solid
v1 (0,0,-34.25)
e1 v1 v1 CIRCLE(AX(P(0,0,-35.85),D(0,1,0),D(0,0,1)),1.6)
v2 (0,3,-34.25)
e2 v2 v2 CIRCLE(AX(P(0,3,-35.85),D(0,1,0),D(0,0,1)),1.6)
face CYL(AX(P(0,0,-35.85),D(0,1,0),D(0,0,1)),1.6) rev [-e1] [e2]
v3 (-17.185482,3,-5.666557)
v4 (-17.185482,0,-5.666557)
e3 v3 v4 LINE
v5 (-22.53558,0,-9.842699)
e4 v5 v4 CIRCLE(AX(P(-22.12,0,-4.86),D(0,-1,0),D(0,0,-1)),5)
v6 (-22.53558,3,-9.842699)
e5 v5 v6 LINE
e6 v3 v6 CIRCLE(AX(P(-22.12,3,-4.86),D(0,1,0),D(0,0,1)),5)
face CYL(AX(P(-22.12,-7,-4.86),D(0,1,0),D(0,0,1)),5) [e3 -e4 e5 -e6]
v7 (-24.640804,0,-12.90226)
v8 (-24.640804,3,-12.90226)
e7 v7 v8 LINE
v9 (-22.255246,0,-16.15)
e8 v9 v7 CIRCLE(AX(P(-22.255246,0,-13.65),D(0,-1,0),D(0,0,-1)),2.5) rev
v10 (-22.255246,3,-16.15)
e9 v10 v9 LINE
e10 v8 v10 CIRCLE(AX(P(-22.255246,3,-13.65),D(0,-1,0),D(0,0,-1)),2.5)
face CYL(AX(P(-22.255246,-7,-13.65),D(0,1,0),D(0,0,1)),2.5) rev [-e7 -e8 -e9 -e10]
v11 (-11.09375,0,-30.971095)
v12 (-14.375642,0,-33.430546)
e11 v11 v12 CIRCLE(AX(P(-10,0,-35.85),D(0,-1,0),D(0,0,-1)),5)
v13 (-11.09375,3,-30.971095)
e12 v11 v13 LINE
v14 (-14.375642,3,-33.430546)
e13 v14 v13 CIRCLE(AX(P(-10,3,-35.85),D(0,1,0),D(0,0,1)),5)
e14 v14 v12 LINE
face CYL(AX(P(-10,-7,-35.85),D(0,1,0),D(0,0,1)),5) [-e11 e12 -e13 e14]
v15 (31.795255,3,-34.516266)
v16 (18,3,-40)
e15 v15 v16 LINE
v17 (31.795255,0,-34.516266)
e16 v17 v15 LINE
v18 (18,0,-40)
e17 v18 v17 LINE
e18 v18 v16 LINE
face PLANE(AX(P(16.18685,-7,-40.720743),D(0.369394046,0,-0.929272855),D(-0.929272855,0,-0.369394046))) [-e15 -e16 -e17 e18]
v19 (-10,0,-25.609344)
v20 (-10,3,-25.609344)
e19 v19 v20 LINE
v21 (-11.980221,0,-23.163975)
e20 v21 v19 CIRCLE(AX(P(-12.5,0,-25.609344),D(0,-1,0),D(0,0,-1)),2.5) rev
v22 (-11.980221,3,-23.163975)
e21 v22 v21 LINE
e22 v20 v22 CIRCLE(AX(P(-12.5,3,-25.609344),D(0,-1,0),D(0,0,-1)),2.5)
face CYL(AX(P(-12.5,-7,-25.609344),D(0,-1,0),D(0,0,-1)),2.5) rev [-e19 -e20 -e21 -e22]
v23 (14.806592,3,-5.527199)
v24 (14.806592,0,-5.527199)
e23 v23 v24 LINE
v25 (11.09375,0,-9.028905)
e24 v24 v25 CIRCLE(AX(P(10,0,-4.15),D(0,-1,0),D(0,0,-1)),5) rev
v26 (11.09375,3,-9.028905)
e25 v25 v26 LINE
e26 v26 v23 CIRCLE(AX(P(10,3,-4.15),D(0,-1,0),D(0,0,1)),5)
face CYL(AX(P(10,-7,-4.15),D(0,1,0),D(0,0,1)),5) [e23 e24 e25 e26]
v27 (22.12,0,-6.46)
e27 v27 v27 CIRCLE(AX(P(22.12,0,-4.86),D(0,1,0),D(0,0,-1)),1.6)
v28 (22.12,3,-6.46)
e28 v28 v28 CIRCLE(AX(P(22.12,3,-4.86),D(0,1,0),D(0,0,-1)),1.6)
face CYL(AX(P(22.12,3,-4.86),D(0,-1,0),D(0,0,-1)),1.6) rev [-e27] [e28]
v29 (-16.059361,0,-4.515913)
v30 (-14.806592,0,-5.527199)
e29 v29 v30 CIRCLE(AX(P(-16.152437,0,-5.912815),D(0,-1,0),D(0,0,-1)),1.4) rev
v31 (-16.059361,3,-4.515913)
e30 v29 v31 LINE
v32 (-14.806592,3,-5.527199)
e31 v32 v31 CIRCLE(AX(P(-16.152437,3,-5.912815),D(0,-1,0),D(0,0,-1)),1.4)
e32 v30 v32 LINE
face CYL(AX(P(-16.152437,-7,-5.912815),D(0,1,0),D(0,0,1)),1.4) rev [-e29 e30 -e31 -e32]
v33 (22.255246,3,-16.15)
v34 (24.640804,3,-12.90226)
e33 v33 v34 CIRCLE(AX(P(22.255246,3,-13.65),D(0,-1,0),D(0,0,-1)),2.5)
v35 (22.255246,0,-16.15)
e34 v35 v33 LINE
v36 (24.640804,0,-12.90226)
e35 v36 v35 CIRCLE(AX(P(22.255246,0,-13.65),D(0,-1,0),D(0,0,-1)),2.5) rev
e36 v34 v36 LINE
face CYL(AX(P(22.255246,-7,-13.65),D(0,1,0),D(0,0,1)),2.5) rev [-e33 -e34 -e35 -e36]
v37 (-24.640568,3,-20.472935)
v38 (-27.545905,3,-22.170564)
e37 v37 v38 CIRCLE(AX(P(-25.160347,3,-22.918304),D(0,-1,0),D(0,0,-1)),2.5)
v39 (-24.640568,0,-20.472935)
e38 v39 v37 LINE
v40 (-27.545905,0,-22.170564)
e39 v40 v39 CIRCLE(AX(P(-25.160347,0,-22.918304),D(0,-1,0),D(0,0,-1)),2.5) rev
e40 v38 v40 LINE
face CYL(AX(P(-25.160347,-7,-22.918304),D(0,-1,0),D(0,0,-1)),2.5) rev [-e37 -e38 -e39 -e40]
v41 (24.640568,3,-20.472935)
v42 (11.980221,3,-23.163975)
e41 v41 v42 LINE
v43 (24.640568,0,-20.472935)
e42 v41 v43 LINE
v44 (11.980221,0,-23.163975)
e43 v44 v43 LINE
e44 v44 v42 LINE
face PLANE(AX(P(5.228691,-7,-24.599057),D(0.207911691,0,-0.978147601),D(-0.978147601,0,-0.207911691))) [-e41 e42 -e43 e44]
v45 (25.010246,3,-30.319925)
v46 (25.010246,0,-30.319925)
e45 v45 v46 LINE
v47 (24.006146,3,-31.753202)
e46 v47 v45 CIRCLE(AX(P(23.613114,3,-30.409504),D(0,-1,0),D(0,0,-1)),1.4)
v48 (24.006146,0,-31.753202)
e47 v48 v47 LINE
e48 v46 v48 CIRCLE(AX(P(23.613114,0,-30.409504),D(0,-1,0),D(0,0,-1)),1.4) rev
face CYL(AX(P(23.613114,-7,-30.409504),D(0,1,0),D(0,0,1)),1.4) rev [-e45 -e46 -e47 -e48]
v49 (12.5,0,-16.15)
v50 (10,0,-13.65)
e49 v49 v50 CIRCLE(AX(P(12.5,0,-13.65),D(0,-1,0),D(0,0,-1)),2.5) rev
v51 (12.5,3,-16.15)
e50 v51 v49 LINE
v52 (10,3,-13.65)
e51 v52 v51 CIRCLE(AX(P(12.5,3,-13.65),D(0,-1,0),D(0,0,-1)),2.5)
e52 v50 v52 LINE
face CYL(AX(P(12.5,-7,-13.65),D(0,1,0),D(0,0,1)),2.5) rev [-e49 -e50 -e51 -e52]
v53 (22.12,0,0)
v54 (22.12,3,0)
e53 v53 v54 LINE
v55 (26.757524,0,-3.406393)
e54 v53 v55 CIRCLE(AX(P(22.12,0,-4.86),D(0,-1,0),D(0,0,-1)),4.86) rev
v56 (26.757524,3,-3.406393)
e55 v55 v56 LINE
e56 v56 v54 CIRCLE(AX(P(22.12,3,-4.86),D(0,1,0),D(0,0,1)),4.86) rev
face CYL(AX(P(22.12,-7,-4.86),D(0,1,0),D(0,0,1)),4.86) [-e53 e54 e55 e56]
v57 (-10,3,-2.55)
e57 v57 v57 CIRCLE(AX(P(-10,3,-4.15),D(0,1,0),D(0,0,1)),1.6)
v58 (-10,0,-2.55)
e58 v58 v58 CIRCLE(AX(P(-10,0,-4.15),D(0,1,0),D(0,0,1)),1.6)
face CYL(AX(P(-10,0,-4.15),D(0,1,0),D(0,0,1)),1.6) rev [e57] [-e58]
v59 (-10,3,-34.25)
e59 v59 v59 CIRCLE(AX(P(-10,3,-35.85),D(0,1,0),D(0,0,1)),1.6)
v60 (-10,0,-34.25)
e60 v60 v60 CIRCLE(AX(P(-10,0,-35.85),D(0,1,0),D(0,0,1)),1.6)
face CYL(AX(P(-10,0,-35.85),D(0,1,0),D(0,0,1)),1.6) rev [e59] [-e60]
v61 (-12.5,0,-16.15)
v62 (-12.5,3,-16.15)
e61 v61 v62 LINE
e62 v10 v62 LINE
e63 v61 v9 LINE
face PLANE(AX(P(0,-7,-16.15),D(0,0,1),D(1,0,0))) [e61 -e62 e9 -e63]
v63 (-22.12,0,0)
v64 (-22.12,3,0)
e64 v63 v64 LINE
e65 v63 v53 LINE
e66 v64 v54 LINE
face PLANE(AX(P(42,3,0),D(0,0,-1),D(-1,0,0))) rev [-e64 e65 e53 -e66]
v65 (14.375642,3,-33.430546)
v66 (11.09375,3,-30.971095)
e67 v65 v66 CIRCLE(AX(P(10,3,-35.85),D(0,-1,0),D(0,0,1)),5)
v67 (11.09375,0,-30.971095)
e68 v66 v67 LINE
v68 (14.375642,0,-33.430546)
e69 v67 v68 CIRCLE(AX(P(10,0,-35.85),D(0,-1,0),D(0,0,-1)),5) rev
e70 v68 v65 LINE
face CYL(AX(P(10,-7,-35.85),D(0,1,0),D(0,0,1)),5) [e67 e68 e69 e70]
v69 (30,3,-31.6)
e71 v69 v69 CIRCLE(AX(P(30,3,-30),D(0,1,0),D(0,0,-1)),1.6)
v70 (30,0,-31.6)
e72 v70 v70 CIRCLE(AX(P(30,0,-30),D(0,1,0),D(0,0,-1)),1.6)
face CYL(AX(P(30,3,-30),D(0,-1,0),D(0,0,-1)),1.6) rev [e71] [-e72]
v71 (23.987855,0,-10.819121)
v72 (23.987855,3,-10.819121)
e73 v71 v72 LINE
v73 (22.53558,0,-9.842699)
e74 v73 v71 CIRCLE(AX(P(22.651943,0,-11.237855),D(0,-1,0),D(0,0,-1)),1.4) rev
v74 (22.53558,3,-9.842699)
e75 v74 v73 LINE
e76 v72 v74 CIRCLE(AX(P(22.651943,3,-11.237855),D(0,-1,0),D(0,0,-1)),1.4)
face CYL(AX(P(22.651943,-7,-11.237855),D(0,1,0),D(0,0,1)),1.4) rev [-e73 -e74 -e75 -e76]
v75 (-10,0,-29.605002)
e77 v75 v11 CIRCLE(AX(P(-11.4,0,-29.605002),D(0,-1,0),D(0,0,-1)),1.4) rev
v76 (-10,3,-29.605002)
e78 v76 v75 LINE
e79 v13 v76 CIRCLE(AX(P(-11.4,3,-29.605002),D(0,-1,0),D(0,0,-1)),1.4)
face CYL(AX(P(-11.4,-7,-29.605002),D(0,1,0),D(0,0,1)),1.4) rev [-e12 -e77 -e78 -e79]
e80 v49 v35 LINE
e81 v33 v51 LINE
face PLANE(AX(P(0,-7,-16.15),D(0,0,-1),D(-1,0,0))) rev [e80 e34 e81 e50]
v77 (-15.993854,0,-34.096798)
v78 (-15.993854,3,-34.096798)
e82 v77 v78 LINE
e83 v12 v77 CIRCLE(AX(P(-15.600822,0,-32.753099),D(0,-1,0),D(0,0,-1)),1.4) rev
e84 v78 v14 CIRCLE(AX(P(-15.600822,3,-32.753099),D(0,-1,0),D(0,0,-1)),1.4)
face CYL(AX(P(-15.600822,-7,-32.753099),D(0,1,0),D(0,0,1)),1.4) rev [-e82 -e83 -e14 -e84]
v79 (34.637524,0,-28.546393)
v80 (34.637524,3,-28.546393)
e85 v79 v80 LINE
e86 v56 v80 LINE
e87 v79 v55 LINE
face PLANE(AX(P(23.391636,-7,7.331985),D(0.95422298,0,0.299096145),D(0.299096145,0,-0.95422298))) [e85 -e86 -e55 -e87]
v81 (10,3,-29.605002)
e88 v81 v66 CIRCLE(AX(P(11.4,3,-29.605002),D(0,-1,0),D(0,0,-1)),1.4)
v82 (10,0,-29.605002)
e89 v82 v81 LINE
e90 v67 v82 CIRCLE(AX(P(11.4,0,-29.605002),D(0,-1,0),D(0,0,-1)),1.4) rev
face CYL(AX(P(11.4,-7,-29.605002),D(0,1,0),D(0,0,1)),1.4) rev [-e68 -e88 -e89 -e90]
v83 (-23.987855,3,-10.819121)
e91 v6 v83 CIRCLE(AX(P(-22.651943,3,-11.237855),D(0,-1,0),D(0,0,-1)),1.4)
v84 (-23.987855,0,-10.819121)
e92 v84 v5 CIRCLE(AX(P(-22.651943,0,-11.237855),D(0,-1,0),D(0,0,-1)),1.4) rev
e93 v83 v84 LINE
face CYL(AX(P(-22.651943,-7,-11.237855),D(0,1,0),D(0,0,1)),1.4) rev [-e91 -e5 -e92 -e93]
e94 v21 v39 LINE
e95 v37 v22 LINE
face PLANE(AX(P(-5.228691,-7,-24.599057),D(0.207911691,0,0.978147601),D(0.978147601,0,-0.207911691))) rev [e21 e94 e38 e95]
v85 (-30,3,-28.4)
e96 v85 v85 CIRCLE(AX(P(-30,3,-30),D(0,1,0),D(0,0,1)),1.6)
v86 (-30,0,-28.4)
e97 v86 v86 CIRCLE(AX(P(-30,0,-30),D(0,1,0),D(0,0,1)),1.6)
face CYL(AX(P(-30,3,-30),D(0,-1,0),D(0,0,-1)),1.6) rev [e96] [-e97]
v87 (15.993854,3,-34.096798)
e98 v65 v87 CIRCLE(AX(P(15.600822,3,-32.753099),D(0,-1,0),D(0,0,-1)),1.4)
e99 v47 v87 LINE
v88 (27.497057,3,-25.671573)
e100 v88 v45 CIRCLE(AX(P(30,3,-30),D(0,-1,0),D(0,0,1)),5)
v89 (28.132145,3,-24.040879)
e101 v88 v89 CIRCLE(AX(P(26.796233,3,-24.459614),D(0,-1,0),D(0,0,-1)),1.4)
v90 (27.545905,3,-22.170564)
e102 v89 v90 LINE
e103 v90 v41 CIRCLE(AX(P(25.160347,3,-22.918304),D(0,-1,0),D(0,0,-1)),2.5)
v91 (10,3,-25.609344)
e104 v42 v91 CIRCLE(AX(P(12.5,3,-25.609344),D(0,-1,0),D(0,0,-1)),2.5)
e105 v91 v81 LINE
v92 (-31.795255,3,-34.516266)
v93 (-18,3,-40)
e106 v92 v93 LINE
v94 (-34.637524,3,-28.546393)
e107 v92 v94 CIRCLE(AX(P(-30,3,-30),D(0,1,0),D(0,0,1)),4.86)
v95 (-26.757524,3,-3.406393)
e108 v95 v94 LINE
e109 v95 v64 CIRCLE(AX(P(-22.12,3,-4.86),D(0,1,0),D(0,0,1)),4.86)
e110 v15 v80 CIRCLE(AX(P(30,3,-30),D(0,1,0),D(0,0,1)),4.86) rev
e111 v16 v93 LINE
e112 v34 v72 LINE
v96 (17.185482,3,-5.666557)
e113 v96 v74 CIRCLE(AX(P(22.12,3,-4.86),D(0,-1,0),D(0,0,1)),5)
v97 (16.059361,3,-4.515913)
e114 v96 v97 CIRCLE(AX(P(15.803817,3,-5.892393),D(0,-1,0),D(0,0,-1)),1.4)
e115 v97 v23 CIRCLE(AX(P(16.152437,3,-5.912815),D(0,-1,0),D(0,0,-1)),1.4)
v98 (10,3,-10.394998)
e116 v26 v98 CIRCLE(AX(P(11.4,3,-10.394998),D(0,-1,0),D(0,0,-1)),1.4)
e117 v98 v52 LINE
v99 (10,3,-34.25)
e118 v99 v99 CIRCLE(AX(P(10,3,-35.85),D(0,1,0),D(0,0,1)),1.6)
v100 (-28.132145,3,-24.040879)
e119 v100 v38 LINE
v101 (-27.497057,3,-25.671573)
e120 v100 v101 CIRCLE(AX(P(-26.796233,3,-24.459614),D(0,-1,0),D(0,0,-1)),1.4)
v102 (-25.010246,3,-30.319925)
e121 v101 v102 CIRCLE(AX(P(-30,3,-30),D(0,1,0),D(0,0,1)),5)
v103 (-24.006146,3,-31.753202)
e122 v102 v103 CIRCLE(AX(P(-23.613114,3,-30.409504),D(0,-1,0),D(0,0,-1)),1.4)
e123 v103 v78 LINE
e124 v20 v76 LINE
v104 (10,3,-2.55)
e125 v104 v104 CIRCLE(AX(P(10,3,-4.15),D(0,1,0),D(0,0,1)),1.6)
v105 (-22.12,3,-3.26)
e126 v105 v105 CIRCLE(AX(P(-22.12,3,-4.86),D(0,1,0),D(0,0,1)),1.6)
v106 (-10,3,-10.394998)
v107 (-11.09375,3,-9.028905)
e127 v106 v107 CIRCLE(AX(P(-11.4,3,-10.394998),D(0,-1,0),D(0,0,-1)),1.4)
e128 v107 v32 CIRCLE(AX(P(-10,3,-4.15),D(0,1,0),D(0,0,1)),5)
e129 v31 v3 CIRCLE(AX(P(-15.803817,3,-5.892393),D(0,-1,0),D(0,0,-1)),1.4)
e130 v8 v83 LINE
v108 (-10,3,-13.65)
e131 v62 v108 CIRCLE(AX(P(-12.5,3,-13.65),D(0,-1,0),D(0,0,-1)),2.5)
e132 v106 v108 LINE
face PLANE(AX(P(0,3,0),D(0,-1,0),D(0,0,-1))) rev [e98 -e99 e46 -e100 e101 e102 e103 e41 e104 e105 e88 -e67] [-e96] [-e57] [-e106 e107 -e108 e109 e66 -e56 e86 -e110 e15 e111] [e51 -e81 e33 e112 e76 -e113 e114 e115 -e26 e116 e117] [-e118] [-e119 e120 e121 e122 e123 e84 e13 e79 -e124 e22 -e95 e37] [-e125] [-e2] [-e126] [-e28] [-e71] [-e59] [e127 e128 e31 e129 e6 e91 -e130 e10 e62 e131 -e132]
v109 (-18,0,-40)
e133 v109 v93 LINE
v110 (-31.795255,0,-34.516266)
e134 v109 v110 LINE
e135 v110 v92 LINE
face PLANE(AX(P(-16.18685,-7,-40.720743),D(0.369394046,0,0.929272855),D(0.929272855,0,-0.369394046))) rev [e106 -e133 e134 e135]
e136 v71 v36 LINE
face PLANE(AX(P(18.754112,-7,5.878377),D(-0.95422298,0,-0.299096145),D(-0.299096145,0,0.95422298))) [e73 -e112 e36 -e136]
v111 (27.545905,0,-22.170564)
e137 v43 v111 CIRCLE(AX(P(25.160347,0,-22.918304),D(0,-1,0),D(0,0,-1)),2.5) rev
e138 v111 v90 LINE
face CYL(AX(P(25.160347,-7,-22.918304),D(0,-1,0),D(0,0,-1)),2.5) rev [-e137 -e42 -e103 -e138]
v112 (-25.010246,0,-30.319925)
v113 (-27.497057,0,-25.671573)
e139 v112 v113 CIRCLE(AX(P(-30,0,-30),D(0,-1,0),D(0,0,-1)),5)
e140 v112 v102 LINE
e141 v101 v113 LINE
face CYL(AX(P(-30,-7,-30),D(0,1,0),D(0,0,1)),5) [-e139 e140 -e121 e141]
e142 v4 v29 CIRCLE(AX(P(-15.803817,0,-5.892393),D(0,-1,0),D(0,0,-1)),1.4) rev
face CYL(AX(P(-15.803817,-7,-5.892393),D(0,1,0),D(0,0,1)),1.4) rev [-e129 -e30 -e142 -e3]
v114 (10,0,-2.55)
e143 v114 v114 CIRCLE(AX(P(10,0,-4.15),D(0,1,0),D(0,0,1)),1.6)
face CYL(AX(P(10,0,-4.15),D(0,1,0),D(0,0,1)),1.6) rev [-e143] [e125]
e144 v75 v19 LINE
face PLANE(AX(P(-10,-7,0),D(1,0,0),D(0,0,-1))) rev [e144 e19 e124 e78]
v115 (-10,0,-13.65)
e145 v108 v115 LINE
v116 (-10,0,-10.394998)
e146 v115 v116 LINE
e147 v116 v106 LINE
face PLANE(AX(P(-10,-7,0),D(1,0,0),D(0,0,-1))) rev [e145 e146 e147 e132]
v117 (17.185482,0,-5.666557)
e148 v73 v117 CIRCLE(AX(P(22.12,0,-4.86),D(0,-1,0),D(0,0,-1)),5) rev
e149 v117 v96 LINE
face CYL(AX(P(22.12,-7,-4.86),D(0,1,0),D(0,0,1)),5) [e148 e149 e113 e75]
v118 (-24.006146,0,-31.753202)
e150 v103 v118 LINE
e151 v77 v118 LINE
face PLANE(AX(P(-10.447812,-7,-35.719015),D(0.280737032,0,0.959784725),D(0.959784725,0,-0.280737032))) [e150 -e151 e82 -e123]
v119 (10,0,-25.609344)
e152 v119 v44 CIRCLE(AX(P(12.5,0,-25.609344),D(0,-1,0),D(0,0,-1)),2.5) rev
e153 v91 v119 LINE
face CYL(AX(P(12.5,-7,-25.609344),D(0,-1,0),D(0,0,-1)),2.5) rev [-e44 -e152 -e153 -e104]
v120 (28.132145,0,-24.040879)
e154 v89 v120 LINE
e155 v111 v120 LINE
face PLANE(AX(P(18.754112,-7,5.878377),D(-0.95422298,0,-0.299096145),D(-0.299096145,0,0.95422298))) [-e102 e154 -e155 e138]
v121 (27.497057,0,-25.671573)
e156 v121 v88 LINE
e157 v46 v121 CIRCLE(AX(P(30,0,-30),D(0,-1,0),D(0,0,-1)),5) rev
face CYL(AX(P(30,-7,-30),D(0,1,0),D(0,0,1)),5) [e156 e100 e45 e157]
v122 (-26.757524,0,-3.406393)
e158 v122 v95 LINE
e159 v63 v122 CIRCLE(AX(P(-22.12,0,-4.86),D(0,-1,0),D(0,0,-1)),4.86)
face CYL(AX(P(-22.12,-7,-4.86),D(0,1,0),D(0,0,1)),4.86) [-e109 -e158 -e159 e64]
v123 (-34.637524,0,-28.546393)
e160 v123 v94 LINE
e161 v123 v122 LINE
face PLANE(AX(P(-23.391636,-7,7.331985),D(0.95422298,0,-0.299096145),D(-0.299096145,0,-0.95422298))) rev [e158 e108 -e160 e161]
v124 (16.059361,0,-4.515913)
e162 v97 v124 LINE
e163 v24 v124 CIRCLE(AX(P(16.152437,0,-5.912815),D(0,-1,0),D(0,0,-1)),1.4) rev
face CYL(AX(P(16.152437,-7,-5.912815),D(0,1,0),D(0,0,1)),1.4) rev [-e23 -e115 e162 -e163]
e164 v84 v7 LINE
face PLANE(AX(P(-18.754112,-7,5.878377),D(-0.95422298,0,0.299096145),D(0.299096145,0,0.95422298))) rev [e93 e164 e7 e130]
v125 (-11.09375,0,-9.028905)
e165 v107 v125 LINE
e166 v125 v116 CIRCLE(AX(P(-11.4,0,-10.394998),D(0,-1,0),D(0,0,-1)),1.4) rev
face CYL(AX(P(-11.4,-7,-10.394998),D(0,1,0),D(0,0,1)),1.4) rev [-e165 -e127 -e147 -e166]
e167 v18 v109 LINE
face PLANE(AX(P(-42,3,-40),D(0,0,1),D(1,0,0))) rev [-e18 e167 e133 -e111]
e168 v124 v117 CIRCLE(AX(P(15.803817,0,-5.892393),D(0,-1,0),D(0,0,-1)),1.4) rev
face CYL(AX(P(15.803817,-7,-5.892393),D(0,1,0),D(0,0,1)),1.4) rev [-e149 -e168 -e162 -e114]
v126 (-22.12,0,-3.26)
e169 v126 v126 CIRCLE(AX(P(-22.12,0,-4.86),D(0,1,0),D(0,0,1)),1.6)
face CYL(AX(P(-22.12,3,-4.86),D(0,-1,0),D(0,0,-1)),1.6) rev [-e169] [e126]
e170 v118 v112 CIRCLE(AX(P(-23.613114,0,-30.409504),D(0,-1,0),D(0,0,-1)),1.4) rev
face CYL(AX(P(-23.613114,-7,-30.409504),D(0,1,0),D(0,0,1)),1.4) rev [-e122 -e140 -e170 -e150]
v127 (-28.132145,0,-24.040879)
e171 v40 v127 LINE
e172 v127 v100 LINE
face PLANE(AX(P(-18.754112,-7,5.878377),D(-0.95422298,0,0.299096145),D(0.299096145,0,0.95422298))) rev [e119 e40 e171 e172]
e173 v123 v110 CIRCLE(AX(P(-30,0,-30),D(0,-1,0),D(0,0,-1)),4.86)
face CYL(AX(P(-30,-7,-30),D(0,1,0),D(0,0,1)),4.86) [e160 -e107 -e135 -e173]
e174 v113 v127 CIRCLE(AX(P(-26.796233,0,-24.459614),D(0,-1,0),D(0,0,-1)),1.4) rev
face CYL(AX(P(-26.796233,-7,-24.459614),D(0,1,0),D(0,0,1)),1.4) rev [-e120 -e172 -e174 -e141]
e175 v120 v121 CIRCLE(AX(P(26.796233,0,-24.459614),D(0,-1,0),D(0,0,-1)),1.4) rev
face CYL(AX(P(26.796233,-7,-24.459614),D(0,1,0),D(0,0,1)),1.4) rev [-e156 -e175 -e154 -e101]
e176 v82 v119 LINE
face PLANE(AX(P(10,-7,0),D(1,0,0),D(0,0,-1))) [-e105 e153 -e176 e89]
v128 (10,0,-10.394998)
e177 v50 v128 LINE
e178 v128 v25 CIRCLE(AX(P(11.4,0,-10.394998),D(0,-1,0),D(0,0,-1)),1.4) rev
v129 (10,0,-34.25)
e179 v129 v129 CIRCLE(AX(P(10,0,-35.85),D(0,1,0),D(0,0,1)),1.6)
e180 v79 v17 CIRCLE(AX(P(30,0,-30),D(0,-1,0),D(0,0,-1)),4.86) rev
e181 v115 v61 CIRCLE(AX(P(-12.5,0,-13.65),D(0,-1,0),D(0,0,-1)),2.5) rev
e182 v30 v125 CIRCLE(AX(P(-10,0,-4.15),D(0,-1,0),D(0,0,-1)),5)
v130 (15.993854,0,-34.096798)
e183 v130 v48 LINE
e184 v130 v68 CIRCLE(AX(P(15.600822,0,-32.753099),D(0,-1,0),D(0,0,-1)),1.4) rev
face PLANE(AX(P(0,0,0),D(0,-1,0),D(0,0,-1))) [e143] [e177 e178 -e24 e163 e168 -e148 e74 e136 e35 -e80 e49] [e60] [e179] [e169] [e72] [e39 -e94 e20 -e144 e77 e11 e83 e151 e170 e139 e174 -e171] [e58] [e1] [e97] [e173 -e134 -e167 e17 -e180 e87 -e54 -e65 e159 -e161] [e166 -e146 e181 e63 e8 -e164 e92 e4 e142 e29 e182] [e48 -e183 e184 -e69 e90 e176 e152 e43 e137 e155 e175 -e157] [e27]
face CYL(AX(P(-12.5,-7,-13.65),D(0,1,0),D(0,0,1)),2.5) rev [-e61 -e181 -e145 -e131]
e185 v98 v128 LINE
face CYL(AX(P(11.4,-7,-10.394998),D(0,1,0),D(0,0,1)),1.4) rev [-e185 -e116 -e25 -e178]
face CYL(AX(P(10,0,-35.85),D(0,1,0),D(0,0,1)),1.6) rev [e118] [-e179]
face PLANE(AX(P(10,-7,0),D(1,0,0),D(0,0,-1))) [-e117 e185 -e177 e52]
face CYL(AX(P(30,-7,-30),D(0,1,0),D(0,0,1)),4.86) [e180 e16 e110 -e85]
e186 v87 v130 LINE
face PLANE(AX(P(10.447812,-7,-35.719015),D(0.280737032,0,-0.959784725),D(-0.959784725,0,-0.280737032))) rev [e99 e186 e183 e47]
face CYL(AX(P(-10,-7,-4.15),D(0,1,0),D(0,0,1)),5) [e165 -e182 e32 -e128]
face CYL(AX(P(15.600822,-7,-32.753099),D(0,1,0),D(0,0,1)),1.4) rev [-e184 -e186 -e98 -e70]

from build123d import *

# Parameters (mm, degrees)
SKETCH_1_R             = 1.6
EXTRUDE_1_DEPTH        = 3
SKETCH_2_R             = 1.6
CUT_EXTRUDE_1_DEPTH    = 59.077534383
CUT_EXTRUDE_2_DEPTH    = 10
CUT_EXTRUDE_3_DEPTH    = 10
FILLET_1_R             = 2.5
FILLET_2_R             = 1.4
FILLET_1_OF_MIRROR_1_R = 2.5
FILLET_2_OF_MIRROR_1_R = 1.4


with BuildPart() as part:
    # 草图1 → 凸台-拉伸1 (new body)
    with BuildSketch(Plane(origin=(0, 0, 0), x_dir=(1, 0, 0), z_dir=(0, 1, 0))):
        Polygon((42, 0), (-42, 0), (-42, 40), (0, 40), (42, 40), align=None)
        with Locations(Location((-22.12, 4.86, 0), (0, 0, 270))):
            Circle(SKETCH_1_R, mode=Mode.SUBTRACT)
        with Locations(Location((-30, 30, 0), (0, 0, 270))):
            Circle(SKETCH_1_R, mode=Mode.SUBTRACT)
        with Locations(Location((30, 30, 0), (0, 0, 90))):
            Circle(SKETCH_1_R, mode=Mode.SUBTRACT)
        with Locations(Location((22.12, 4.86, 0), (0, 0, 90))):
            Circle(SKETCH_1_R, mode=Mode.SUBTRACT)
    extrude(amount=EXTRUDE_1_DEPTH)

    # 草图2 → 切除-拉伸1 (cut, through all)
    with BuildSketch(Plane(origin=(0, 3, 0), x_dir=(1, 0, 0), z_dir=(0, 1, 0))):
        with Locations(Location((-10, 35.85, 0), (0, 0, 270))):
            Circle(SKETCH_2_R)
        with Locations(Location((10, 35.85, 0), (0, 0, 270))):
            Circle(SKETCH_2_R)
        with Locations(Location((-10, 4.15, 0), (0, 0, 270))):
            Circle(SKETCH_2_R)
        with Locations(Location((10, 4.15, 0), (0, 0, 270))):
            Circle(SKETCH_2_R)
        with Locations(Location((0, 35.85, 0), (0, 0, 270))):
            Circle(SKETCH_2_R)
    extrude(amount=-CUT_EXTRUDE_1_DEPTH, mode=Mode.SUBTRACT)

    # 草图3 → 切除-拉伸2 (cut)
    with BuildSketch(Plane(origin=(0, 3, 0), x_dir=(1, 0, 0), z_dir=(0, 1, 0))):
        with BuildLine():
            ThreePointArc((-22.12, 0), (-24.997070445, 0.943105101), (-26.757523684, 3.406392735))
            Line((-26.757523684, 3.406392735), (-34.637523684, 28.546392735))
            ThreePointArc((-34.637523684, 28.546392735), (-34.388052817, 32.089160711), (-31.795255063, 34.516266075))
            Line((-31.795255063, 34.516266075), (-18, 40))
            Line((-18, 40), (-42, 40))
            Line((-42, 40), (-42, 0))
            Line((-42, 0), (-22.12, 0))
        make_face()
        with BuildLine():
            ThreePointArc((26.757523684, 3.406392735), (24.997070445, 0.943105101), (22.12, 0))
            Line((22.12, 0), (42, 0))
            Line((42, 0), (42, 40))
            Line((42, 40), (18, 40))
            Line((18, 40), (31.795255063, 34.516266075))
            ThreePointArc((31.795255063, 34.516266075), (34.021476073, 32.728979699), (34.86, 30))
            ThreePointArc((34.86, 30), (34.804058966, 29.264733077), (34.637523684, 28.546392735))
            Line((34.637523684, 28.546392735), (26.757523684, 3.406392735))
        make_face()
    extrude(amount=-CUT_EXTRUDE_2_DEPTH, mode=Mode.SUBTRACT)

    # 草图4 → 切除-拉伸3 (cut)
    with BuildSketch(Plane(origin=(0, 3, 0), x_dir=(1, 0, 0), z_dir=(0, 1, 0))):
        with BuildLine():
            Line((-14.798923626, 34.446314839), (-25.201076374, 31.403685161))
            ThreePointArc((-25.201076374, 31.403685161), (-25.050524365, 30.709007006), (-25, 30))
            ThreePointArc((-25, 30), (-25.970272737, 27.040050982), (-28.504519275, 25.228885099))
            Line((-28.504519275, 25.228885099), (-26.865552904, 20))
            Line((-26.865552904, 20), (-10, 23.584883936))
            Line((-10, 23.584883936), (-10, 30.85))
            ThreePointArc((-10, 30.85), (-12.998464123, 31.848848553), (-14.798923626, 34.446314839))
        make_face()
        with BuildLine():
            Line((-10, 16.15), (-25.658790772, 16.15))
            Line((-25.658790772, 16.15), (-23.615480725, 9.631114901))
            ThreePointArc((-23.615480725, 9.631114901), (-19.160050982, 8.889727263), (-17.12, 4.86))
            ThreePointArc((-17.12, 4.86), (-17.122139776, 4.713735907), (-17.128557274, 4.567597002))
            Line((-17.128557274, 4.567597002), (-14.991442726, 4.442402998))
            ThreePointArc((-14.991442726, 4.442402998), (-13.430596523, 7.787445188), (-10, 9.15))
            Line((-10, 9.15), (-10, 16.15))
        make_face()
    cut_extrude_3 = extrude(amount=-CUT_EXTRUDE_3_DEPTH, mode=Mode.SUBTRACT)

    # 圆角1
    fillet_1_edges = [part.edges().sort_by_distance(p)[0] for p in [
        (-10, 1.5, -23.584883936),
        (-26.865552904, 1.5, -20),
        (-25.658790772, 1.5, -16.15),
        (-10, 1.5, -16.15),
    ]]
    fillet(fillet_1_edges, radius=FILLET_1_R)

    # 圆角2
    # the kernel refuses this fillet: 1.4 mm, written as the material it adds along each edge
    with BuildSketch(Plane(origin=(-23.615480725, 3, -9.631114901), x_dir=(0.9813413175629745, 0, -0.1922738111230053), z_dir=(0, -1, 0)), Plane(origin=(-14.991442726, 3, -4.442402998), x_dir=(0.1679804165145185, 0, -0.9857903325086977), z_dir=(0, -1, 0))) as fillet_2_piece_1:
        with BuildLine():
            CenterArc((1.254493801, -1.391497509), FILLET_2_R, 96.317812547, 77.364374907)
            Line((-0.137003708, -1.237436867), (0, 0))
            ThreePointArc((0, 0), (0.55021658, -0.030366038), (1.100433159, 0))
        make_face()
    extrude(amount=3)
    with BuildSketch(Plane(origin=(-10, 3, -9.15), x_dir=(0, 0, -1), z_dir=(0, -1, 0)), Plane(origin=(-17.128557274, 3, -4.567597002), x_dir=(0.998288545196741, 0, 0.058480599594858615), z_dir=(0, -1, 0))) as fillet_2_piece_2:
        with BuildLine():
            CenterArc((1.244997998, -1.4), FILLET_2_R, 90, 77.364374907)
            ThreePointArc((-0.121095314, -1.09375), (-0.030366038, -0.55021658), (0, 0))
            Line((0, 0), (1.244997998, 0))
        make_face()
    extrude(amount=3)
    with BuildSketch(Plane(origin=(-10, 3, -30.85), x_dir=(0, 0, 1), z_dir=(0, -1, 0)), Plane(origin=(-25.201076374, 3, -31.403685161), x_dir=(0.9597847252329514, 0, -0.2807370321306184), z_dir=(0, -1, 0))) as fillet_2_piece_3:
        with BuildLine():
            CenterArc((1.244997998, 1.4), FILLET_2_R, 192.635625093, 77.364374907)
            ThreePointArc((-0.121095314, 1.09375), (-0.030366038, 0.55021658), (0, 0))
            Line((0, 0), (1.244997998, 0))
        make_face()
    extrude(amount=3)
    with BuildSketch(Plane(origin=(-14.798923626, 3, -34.446314839), x_dir=(0.3846499515684246, 0, 0.9230625194202224), z_dir=(0, -1, 0)), Plane(origin=(-28.504519275, 3, -25.228885099), x_dir=(0.9155142544303774, 0, -0.4022855328430172), z_dir=(0, -1, 0))) as fillet_2_piece_4:
        with BuildLine():
            CenterArc((1.254493801, 1.391497509), FILLET_2_R, 186.317812547, 77.364374907)
            Line((-0.137003708, 1.237436867), (0, 0))
            ThreePointArc((0, 0), (0.55021658, 0.030366038), (1.100433159, 0))
        make_face()
    extrude(amount=3)

    # 镜向1: 切除-拉伸3 across plane
    add(cut_extrude_3.mirror(Plane(origin=(0, 0, 0), x_dir=(0, 0, 1), z_dir=(1, 0, 0))), mode=Mode.SUBTRACT)

    # 圆角1 of 镜向1
    fillet_1_of_mirror_1_edges = [part.edges().sort_by_distance(p)[0] for p in [
        (10, 1.5, -23.584883936),
        (26.865552904, 1.5, -20),
        (25.658790772, 1.5, -16.15),
        (10, 1.5, -16.15),
    ]]
    fillet(fillet_1_of_mirror_1_edges, radius=FILLET_1_OF_MIRROR_1_R)

    # 圆角2 of 镜向1
    # the kernel refuses this fillet: 1.4 mm, written as the material it adds along each edge
    with BuildSketch(Plane(origin=(23.615480725, 3, -9.631114901), x_dir=(0.2990961449676297, 0, -0.9542229802648344), z_dir=(0, -1, 0)), Plane(origin=(10, 3, -30.85), x_dir=(0, 0, 1), z_dir=(0, -1, 0)), Plane(origin=(25.201076374, 3, -31.403685161), x_dir=(-0.9597847252329514, 0, -0.2807370321306184), z_dir=(0, -1, 0)), Plane(origin=(14.991442726, 3, -4.442402998), x_dir=(0.9982885451967423, 0, -0.05848059959483981), z_dir=(0, -1, 0))) as fillet_2_of_mirror_1_piece_1:
        with BuildLine():
            CenterArc((1.244997998, -1.4), FILLET_2_OF_MIRROR_1_R, 90, 77.364374907)
            ThreePointArc((-0.121095314, -1.09375), (-0.030366038, -0.55021658), (0, 0))
            Line((0, 0), (1.244997998, 0))
        make_face()
    extrude(amount=3)
    with BuildSketch(Plane(origin=(10, 3, -9.15), x_dir=(0.993926792387083, 0, 0.11004331590389448), z_dir=(0, -1, 0)), Plane(origin=(14.798923626, 3, -34.446314839), x_dir=(-0.3846499515684246, 0, 0.9230625194202224), z_dir=(0, -1, 0)), Plane(origin=(28.504519275, 3, -25.228885099), x_dir=(-0.9155142544303774, 0, -0.4022855328430172), z_dir=(0, -1, 0)), Plane(origin=(17.128557274, 3, -4.567597002), x_dir=(0.05172954697013894, 0, -0.9986611306996304), z_dir=(0, -1, 0))) as fillet_2_of_mirror_1_piece_2:
        with BuildLine():
            CenterArc((1.254493801, -1.391497509), FILLET_2_OF_MIRROR_1_R, 96.317812547, 77.364374907)
            Line((-0.137003708, -1.237436867), (0, 0))
            ThreePointArc((0, 0), (0.55021658, -0.030366038), (1.100433159, 0))
        make_face()
    extrude(amount=3)


solid = part.part
